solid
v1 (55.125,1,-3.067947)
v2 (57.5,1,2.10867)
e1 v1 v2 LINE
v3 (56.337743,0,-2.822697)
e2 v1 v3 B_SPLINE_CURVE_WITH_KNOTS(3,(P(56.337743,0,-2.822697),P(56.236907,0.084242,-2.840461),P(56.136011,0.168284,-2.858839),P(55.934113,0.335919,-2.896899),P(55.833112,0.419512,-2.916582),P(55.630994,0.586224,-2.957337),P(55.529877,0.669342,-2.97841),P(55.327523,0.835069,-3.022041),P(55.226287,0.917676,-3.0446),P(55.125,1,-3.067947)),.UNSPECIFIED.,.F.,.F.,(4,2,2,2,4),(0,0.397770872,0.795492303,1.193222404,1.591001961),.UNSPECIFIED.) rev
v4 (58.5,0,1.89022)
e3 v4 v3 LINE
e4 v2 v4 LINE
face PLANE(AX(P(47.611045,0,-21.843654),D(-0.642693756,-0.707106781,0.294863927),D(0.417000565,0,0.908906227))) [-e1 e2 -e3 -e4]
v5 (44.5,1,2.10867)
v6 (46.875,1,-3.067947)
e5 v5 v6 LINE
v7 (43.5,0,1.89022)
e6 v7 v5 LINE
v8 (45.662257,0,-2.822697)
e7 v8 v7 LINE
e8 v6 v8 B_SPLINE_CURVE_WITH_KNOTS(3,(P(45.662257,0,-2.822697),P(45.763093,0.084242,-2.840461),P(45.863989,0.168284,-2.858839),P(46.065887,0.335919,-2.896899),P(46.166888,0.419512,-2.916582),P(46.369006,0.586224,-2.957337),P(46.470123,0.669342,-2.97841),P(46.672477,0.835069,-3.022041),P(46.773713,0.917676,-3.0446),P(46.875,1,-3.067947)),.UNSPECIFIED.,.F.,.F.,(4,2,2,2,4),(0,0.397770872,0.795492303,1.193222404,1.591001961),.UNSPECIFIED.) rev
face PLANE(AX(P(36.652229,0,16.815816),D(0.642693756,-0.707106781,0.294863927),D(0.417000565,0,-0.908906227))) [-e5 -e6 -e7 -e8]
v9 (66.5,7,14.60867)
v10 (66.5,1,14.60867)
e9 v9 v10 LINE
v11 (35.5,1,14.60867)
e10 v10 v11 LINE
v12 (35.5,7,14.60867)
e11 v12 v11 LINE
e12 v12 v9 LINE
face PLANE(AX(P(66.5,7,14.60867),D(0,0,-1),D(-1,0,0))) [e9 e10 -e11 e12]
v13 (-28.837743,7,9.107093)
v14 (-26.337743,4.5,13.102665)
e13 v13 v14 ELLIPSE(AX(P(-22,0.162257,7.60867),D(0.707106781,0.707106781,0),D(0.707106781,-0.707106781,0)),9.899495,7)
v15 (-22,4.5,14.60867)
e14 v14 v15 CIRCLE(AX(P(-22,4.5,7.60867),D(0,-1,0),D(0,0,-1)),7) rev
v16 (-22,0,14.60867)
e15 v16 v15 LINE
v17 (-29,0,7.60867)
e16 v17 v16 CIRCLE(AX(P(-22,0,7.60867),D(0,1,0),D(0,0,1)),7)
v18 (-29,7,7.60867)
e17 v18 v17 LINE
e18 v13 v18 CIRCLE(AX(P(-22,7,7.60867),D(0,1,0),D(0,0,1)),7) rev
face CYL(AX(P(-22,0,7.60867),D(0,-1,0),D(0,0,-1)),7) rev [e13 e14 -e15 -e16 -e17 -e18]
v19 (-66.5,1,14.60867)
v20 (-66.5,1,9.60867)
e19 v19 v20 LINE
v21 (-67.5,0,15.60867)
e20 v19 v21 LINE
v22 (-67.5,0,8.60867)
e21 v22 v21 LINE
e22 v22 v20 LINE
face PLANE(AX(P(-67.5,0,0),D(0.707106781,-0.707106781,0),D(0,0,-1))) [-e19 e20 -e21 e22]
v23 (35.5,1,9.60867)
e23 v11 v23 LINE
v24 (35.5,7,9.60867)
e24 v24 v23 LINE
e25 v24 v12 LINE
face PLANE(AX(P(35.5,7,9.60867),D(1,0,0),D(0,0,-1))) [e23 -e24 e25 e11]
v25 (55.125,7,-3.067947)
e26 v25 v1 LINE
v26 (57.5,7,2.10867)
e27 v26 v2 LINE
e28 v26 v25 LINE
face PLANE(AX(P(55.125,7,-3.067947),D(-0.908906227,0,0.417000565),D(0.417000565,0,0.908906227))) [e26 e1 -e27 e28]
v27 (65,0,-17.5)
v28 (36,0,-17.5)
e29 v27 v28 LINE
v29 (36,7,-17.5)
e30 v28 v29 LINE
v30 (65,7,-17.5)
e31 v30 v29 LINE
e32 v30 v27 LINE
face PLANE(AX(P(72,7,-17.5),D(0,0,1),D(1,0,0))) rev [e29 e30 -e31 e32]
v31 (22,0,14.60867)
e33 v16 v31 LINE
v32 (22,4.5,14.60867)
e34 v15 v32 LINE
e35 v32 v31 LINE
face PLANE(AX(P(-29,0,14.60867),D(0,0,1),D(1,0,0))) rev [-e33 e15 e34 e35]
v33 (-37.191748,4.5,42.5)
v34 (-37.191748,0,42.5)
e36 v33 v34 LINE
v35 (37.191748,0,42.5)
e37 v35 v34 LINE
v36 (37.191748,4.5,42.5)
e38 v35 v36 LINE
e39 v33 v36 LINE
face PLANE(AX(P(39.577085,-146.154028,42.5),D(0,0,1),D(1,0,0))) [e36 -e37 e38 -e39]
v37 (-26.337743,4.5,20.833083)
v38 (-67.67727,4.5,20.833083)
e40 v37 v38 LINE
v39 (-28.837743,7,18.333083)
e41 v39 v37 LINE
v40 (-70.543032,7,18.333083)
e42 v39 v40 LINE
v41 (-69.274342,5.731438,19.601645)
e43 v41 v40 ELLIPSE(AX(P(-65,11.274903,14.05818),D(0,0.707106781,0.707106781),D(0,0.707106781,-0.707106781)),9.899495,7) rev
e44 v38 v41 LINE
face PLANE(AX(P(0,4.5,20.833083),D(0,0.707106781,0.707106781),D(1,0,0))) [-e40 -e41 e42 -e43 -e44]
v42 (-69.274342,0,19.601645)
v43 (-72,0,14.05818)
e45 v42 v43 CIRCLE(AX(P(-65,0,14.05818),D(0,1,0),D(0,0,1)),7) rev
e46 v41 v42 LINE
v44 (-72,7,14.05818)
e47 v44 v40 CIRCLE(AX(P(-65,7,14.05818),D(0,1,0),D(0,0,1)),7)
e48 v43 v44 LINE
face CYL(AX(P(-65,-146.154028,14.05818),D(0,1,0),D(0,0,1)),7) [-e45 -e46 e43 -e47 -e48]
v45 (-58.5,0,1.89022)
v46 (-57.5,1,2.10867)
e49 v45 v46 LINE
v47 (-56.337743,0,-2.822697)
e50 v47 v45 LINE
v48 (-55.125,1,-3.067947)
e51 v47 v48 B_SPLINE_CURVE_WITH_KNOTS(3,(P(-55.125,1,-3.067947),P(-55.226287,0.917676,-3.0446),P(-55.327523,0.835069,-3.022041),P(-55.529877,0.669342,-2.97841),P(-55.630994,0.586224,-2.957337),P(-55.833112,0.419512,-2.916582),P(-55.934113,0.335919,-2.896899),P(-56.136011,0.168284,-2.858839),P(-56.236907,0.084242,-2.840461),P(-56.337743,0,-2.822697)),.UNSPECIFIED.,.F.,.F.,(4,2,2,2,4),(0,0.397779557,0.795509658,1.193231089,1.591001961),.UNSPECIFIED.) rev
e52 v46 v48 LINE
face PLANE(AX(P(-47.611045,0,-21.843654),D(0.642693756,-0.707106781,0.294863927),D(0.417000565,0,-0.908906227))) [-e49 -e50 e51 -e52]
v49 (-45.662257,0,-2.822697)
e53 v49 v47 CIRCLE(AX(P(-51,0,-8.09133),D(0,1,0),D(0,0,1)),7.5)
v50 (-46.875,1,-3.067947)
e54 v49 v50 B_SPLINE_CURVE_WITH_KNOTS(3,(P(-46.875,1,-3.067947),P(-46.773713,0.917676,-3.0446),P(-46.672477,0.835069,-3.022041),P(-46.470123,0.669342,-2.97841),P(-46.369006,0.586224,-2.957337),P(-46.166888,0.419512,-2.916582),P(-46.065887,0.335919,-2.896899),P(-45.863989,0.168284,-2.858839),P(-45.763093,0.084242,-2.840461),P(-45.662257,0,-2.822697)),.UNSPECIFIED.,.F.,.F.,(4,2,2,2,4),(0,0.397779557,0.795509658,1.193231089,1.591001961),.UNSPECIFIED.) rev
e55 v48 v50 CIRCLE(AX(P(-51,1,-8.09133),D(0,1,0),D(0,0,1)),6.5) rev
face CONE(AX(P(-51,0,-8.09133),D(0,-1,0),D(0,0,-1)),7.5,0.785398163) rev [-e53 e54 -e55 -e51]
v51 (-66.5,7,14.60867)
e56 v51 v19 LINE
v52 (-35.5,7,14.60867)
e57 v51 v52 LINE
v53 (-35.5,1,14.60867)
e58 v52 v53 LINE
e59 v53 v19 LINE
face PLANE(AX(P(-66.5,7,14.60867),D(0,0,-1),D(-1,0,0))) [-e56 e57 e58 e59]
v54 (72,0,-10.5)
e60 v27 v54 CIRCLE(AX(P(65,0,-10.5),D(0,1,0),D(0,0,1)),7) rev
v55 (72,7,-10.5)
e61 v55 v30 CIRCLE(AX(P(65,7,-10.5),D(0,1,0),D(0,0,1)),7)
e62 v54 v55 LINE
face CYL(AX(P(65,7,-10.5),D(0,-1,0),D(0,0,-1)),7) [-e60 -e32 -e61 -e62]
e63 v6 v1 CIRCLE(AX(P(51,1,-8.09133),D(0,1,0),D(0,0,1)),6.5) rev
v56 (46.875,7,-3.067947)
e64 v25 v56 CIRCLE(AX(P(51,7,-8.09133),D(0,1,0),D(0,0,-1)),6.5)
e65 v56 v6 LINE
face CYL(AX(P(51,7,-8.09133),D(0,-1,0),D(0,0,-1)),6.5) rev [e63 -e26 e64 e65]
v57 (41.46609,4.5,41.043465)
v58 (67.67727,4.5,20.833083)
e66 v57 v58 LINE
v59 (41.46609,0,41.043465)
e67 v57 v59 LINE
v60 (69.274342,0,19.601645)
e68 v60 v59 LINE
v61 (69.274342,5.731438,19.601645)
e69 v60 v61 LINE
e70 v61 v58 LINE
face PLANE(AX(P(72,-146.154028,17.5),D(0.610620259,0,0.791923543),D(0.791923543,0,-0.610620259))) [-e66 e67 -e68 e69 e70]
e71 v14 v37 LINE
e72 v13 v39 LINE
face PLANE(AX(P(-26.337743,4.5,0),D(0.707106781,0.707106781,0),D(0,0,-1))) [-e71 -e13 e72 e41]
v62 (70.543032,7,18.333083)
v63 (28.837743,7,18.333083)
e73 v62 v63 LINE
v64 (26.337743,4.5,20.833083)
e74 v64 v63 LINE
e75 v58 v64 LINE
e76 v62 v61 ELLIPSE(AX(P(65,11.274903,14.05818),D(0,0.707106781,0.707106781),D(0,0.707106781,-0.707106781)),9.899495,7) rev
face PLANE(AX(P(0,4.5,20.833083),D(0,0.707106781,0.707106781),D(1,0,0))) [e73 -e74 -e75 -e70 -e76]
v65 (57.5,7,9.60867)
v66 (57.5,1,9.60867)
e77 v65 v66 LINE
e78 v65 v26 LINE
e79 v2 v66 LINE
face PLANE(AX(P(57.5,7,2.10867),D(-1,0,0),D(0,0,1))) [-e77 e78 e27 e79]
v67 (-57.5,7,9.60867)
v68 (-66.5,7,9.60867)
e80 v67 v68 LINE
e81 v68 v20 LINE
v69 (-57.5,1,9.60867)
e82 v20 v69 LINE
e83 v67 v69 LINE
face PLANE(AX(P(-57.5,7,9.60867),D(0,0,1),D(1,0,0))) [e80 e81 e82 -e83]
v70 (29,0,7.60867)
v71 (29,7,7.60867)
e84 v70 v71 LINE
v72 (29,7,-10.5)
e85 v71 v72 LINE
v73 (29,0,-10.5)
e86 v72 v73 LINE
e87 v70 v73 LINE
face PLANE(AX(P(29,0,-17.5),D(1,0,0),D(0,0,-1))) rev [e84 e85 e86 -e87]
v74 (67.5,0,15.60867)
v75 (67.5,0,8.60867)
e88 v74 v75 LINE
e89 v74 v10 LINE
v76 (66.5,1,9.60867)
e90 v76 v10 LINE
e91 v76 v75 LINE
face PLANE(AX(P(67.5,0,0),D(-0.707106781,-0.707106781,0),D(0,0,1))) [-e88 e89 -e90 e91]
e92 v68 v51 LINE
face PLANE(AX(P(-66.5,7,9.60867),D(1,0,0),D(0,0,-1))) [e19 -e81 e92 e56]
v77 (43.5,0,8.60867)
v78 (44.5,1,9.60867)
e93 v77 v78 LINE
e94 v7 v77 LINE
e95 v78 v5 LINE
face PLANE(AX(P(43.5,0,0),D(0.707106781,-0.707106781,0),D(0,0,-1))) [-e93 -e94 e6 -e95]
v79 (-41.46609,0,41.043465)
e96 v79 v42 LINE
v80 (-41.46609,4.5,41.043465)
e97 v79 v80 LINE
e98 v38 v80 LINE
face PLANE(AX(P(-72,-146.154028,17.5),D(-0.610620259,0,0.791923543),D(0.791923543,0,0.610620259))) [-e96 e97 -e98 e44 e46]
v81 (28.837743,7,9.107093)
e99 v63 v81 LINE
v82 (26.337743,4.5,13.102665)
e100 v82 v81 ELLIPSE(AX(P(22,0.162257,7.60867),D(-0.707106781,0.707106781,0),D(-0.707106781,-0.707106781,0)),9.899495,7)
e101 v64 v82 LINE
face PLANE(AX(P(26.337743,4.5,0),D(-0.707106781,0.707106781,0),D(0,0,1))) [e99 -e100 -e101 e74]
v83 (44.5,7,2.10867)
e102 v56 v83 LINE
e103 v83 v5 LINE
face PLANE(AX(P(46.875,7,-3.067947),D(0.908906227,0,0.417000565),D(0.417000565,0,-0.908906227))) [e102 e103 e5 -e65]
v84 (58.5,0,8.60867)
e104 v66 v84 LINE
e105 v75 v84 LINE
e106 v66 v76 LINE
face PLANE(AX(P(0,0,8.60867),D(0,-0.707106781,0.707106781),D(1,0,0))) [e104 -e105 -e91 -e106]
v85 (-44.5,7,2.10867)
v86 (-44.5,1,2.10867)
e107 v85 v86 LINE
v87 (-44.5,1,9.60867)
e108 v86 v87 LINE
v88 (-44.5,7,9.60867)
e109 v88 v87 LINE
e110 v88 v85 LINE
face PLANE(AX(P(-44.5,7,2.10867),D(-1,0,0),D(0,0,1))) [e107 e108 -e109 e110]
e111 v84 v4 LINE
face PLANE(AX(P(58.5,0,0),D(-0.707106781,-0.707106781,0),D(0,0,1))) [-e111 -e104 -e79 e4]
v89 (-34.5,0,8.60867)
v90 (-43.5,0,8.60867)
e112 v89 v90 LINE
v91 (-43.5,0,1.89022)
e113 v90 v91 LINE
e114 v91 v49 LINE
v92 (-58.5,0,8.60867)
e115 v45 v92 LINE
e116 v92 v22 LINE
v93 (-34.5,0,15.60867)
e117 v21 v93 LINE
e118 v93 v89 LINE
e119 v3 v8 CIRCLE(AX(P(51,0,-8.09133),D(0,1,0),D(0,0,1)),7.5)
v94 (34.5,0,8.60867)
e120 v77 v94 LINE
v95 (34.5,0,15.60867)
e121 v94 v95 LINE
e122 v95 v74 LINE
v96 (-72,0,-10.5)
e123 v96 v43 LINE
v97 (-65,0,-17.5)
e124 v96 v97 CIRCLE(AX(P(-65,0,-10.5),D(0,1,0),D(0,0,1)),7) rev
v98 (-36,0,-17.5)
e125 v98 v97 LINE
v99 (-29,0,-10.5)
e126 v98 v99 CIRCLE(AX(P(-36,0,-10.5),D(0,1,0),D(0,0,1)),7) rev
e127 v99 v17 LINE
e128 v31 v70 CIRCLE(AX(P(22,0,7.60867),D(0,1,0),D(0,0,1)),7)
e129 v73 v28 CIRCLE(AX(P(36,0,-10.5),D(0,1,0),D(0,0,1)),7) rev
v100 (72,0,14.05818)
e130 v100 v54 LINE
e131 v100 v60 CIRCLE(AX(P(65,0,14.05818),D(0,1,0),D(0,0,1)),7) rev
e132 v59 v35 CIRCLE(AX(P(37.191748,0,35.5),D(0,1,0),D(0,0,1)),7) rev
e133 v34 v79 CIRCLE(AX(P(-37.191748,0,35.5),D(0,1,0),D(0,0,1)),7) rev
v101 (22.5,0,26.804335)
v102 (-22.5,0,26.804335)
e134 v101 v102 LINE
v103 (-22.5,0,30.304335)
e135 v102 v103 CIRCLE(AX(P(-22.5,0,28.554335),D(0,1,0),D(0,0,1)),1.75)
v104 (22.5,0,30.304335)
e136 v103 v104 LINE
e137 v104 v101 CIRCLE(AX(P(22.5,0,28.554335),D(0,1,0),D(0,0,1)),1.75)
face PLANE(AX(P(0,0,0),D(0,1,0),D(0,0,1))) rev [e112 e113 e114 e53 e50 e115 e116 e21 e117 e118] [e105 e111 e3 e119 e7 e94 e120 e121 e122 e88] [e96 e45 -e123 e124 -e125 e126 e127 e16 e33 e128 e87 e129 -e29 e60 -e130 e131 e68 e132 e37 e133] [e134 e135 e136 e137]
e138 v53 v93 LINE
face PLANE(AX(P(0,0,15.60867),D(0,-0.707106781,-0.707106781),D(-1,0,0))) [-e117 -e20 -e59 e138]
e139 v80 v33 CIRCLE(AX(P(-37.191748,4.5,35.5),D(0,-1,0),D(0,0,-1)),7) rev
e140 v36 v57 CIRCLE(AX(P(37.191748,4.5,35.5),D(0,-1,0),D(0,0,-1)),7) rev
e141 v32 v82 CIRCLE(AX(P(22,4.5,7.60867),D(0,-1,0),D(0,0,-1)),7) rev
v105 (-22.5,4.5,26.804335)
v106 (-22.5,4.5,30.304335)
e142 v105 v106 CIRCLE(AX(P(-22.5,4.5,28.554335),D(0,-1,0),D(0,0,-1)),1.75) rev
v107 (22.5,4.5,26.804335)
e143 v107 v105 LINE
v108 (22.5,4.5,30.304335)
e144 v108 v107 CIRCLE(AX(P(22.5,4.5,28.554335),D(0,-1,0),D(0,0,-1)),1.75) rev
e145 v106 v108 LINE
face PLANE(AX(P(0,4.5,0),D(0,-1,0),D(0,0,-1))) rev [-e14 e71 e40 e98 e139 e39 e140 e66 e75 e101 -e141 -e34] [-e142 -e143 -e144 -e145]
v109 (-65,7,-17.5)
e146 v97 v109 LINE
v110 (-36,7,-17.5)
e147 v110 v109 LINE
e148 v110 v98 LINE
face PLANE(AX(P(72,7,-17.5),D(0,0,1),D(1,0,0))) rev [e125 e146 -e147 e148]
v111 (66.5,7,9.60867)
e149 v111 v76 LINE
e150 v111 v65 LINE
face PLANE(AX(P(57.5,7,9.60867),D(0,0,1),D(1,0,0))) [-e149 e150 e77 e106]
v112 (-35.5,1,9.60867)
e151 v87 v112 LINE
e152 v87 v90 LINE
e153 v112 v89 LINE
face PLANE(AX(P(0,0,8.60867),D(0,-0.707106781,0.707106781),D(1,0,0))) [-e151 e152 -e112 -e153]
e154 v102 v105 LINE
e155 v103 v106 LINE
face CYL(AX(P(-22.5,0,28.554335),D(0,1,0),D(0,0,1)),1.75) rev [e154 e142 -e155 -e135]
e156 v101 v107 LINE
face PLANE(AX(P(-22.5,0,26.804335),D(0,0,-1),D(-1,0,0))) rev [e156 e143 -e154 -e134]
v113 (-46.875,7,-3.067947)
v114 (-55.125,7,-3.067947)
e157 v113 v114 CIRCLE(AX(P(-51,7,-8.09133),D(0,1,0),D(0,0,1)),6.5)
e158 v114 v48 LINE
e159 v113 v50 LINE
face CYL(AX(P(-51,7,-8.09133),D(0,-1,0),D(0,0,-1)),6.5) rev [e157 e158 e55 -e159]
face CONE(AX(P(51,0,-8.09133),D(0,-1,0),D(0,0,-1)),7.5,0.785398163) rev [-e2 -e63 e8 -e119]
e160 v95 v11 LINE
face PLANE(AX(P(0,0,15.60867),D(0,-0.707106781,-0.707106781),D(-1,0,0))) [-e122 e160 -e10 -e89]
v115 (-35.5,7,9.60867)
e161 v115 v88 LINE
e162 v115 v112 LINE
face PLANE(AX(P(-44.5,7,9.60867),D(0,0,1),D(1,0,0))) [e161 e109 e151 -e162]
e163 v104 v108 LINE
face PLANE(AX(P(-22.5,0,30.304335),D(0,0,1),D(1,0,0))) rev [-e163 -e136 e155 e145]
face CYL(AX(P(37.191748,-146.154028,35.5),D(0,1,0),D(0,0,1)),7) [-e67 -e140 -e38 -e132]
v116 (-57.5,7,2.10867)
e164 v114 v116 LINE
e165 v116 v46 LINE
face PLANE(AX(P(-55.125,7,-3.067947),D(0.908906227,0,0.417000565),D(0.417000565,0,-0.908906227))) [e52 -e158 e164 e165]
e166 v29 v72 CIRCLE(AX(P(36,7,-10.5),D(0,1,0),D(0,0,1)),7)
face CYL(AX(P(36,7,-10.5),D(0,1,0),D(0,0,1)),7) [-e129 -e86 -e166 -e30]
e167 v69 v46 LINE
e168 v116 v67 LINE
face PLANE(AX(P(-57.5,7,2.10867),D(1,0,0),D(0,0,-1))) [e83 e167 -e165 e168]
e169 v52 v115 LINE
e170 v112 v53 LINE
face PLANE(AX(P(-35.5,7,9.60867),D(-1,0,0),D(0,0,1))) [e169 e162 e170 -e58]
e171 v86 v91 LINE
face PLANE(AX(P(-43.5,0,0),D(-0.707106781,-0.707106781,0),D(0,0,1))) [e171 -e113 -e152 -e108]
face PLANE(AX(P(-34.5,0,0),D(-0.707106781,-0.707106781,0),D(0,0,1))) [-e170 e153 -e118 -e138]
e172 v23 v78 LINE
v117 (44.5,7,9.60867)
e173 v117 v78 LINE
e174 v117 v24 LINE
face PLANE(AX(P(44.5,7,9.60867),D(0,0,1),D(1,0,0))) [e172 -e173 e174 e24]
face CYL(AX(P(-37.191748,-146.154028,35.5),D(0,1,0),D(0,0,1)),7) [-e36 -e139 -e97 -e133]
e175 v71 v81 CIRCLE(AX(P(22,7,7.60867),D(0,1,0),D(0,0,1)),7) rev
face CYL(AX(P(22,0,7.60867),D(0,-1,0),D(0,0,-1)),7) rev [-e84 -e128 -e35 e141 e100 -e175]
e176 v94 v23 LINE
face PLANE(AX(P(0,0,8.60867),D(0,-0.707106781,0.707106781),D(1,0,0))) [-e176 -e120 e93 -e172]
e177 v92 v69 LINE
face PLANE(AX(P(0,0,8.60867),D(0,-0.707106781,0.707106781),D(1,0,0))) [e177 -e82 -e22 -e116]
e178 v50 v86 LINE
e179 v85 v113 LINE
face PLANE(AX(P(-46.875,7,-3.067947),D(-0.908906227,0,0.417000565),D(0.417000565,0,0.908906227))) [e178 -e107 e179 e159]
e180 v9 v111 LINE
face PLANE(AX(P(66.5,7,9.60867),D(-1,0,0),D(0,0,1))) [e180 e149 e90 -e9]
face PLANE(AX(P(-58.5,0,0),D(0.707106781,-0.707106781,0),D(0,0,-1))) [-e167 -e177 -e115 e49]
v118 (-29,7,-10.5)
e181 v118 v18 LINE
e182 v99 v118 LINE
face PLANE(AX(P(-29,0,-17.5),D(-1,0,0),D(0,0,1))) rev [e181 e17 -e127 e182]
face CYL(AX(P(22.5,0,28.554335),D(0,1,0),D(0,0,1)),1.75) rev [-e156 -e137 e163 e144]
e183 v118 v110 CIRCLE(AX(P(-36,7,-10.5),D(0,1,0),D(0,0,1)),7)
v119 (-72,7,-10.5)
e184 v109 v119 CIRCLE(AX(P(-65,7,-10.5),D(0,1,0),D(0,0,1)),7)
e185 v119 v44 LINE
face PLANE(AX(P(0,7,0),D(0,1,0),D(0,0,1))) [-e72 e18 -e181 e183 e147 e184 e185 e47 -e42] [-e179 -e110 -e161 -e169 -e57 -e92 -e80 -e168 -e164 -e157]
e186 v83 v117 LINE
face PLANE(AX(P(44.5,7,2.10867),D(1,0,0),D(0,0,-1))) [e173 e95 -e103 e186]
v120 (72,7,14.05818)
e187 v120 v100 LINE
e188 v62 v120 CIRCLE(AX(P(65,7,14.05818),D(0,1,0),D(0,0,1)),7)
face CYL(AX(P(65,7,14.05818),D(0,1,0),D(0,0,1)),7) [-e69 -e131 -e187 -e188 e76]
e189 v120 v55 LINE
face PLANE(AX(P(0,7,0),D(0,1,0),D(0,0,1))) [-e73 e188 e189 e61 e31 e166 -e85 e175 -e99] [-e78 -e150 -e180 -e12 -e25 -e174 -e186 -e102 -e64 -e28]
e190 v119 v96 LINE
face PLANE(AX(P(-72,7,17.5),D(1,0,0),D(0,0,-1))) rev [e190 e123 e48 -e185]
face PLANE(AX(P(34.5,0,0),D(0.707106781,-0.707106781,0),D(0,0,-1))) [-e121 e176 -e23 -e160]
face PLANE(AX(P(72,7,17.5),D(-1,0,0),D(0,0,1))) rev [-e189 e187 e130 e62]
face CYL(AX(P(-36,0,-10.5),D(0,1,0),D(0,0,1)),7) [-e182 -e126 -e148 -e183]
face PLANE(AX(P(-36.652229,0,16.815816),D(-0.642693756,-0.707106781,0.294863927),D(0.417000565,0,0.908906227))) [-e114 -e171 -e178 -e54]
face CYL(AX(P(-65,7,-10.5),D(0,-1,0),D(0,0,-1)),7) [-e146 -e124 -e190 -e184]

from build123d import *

# Parameters (mm, degrees)
SKETCH1_W           = 144
SKETCH1_H           = 35
BOSS_EXTRUDE1_DEPTH = 7
BOSS_EXTRUDE2_DEPTH = 7
SKETCH8_W           = 58
SKETCH8_H           = 32.108669786
CUT_EXTRUDE5_DEPTH  = 84.900238379
FILLET1_R           = 7
CUT_EXTRUDE3_DEPTH  = 84.900238379
CUT_EXTRUDE4_DEPTH  = 2.5
CHAMFER2_SIZE       = 2.5
CHAMFER3_SIZE       = 1


with BuildPart() as part:
    # Sketch1 → Boss-Extrude1 (new body)
    with BuildSketch(Plane(origin=(0, 0, 0), x_dir=(1, 0, 0), z_dir=(0, 1, 0))):
        Rectangle(SKETCH1_W, SKETCH1_H)
        with BuildLine():
            Line((-55.125, 3.06794739), (-57.5, -2.108669786))
            Line((-57.5, -2.108669786), (-57.5, -9.608669786))
            Line((-57.5, -9.608669786), (-66.5, -9.608669786))
            Line((-66.5, -9.608669786), (-66.5, -14.608669786))
            Line((-66.5, -14.608669786), (-35.5, -14.608669786))
            Line((-35.5, -14.608669786), (-35.5, -9.608669786))
            Line((-35.5, -9.608669786), (-44.5, -9.608669786))
            Line((-44.5, -9.608669786), (-44.5, -2.108669786))
            Line((-44.5, -2.108669786), (-46.875, 3.06794739))
            ThreePointArc((-46.875, 3.06794739), (-51, 14.591330214), (-55.125, 3.06794739))
        make_face(mode=Mode.SUBTRACT)
        with BuildLine():
            Line((46.875, 3.06794739), (44.5, -2.108669786))
            Line((44.5, -2.108669786), (44.5, -9.608669786))
            Line((44.5, -9.608669786), (35.5, -9.608669786))
            Line((35.5, -9.608669786), (35.5, -14.608669786))
            Line((35.5, -14.608669786), (66.5, -14.608669786))
            Line((66.5, -14.608669786), (66.5, -9.608669786))
            Line((66.5, -9.608669786), (57.5, -9.608669786))
            Line((57.5, -9.608669786), (57.5, -2.108669786))
            Line((57.5, -2.108669786), (55.125, 3.06794739))
            ThreePointArc((55.125, 3.06794739), (51, 14.591330214), (46.875, 3.06794739))
        make_face(mode=Mode.SUBTRACT)
    extrude(amount=BOSS_EXTRUDE1_DEPTH)

    # Sketch6 → Boss-Extrude2 (add)
    with BuildSketch(Plane(origin=(0, 7, 0), x_dir=(1, 0, 0), z_dir=(0, 1, 0))):
        Polygon((72, -17.5), (39.577085299, -42.5), (-39.577085299, -42.5), (-72, -17.5), align=None)
    extrude(amount=-BOSS_EXTRUDE2_DEPTH)

    # Sketch8 → Cut-Extrude5 (cut, through all)
    with BuildSketch(Plane(origin=(0, 7, 0), x_dir=(1, 0, 0), z_dir=(0, 1, 0))):
        with Locations((0, 1.445665107)):
            Rectangle(SKETCH8_W, SKETCH8_H)
    extrude(amount=-CUT_EXTRUDE5_DEPTH, mode=Mode.SUBTRACT)

    # Fillet1
    fillet1_edges = [part.edges().sort_by_distance(p)[0] for p in [
        (29, 3.5, -17.5),
        (29, 3.5, 14.608669786),
        (-72, 3.5, -17.5),
        (72, 3.5, -17.5),
        (39.577085299, 3.5, 42.5),
        (-39.577085299, 3.5, 42.5),
        (72, 3.5, 17.5),
        (-72, 3.5, 17.5),
        (-29, 3.5, 14.608669786),
        (-29, 3.5, -17.5),
    ]]
    fillet(fillet1_edges, radius=FILLET1_R)

    # Sketch4 → Cut-Extrude3 (cut, through all)
    with BuildSketch(Plane(origin=(0, 7, 0), x_dir=(1, 0, 0), z_dir=(0, 1, 0))):
        with BuildLine():
            Line((-22.5, -26.804334893), (22.5, -26.804334893))
            ThreePointArc((22.5, -26.804334893), (24.25, -28.554334893), (22.5, -30.304334893))
            Line((22.5, -30.304334893), (-22.5, -30.304334893))
            ThreePointArc((-22.5, -30.304334893), (-24.25, -28.554334893), (-22.5, -26.804334893))
        make_face()
    extrude(amount=-CUT_EXTRUDE3_DEPTH, mode=Mode.SUBTRACT)

    # Sketch5 → Cut-Extrude4 (cut)
    with BuildSketch(Plane(origin=(0, 7, 0), x_dir=(1, 0, 0), z_dir=(0, 1, 0))):
        Polygon((-28.837742903, 35.825509873), (-28.837742903, -18.333082707), (-81.160450989, -18.333082707), (-81.160450989, -59.181512703), (81.160450989, -59.181512703), (81.160450989, -18.333082707), (28.837742903, -18.333082707), (28.837742903, 35.825509873), align=None)
    extrude(amount=-CUT_EXTRUDE4_DEPTH, mode=Mode.SUBTRACT)

    # Chamfer2
    chamfer2_edges = [part.edges().sort_by_distance(p)[0] for p in [
        (28.837742903, 4.5, 13.720087831),
        (49.690387643, 4.5, 18.333082707),
        (-28.837742903, 4.5, 13.720087831),
        (-49.690387643, 4.5, 18.333082707),
    ]]
    chamfer(chamfer2_edges, length=CHAMFER2_SIZE - 0.0001)  # a hair under: the kernel refuses the full size

    # Chamfer3
    chamfer3_edges = [part.edges().sort_by_distance(p)[0] for p in [
        (-51, 0, -14.591330214),
        (-56.3125, 0, -0.479638802),
        (-57.5, 0, 5.858669786),
        (-62, 0, 9.608669786),
        (-66.5, 0, 12.108669786),
        (-51, 0, 14.608669786),
        (-35.5, 0, 12.108669786),
        (-40, 0, 9.608669786),
        (-44.5, 0, 5.858669786),
        (-45.6875, 0, -0.479638802),
        (51, 0, -14.591330214),
        (45.6875, 0, -0.479638802),
        (44.5, 0, 5.858669786),
        (40, 0, 9.608669786),
        (35.5, 0, 12.108669786),
        (51, 0, 14.608669786),
        (66.5, 0, 12.108669786),
        (62, 0, 9.608669786),
        (57.5, 0, 5.858669786),
        (56.3125, 0, -0.479638802),
    ]]
    chamfer(chamfer3_edges, length=CHAMFER3_SIZE)


solid = part.part
